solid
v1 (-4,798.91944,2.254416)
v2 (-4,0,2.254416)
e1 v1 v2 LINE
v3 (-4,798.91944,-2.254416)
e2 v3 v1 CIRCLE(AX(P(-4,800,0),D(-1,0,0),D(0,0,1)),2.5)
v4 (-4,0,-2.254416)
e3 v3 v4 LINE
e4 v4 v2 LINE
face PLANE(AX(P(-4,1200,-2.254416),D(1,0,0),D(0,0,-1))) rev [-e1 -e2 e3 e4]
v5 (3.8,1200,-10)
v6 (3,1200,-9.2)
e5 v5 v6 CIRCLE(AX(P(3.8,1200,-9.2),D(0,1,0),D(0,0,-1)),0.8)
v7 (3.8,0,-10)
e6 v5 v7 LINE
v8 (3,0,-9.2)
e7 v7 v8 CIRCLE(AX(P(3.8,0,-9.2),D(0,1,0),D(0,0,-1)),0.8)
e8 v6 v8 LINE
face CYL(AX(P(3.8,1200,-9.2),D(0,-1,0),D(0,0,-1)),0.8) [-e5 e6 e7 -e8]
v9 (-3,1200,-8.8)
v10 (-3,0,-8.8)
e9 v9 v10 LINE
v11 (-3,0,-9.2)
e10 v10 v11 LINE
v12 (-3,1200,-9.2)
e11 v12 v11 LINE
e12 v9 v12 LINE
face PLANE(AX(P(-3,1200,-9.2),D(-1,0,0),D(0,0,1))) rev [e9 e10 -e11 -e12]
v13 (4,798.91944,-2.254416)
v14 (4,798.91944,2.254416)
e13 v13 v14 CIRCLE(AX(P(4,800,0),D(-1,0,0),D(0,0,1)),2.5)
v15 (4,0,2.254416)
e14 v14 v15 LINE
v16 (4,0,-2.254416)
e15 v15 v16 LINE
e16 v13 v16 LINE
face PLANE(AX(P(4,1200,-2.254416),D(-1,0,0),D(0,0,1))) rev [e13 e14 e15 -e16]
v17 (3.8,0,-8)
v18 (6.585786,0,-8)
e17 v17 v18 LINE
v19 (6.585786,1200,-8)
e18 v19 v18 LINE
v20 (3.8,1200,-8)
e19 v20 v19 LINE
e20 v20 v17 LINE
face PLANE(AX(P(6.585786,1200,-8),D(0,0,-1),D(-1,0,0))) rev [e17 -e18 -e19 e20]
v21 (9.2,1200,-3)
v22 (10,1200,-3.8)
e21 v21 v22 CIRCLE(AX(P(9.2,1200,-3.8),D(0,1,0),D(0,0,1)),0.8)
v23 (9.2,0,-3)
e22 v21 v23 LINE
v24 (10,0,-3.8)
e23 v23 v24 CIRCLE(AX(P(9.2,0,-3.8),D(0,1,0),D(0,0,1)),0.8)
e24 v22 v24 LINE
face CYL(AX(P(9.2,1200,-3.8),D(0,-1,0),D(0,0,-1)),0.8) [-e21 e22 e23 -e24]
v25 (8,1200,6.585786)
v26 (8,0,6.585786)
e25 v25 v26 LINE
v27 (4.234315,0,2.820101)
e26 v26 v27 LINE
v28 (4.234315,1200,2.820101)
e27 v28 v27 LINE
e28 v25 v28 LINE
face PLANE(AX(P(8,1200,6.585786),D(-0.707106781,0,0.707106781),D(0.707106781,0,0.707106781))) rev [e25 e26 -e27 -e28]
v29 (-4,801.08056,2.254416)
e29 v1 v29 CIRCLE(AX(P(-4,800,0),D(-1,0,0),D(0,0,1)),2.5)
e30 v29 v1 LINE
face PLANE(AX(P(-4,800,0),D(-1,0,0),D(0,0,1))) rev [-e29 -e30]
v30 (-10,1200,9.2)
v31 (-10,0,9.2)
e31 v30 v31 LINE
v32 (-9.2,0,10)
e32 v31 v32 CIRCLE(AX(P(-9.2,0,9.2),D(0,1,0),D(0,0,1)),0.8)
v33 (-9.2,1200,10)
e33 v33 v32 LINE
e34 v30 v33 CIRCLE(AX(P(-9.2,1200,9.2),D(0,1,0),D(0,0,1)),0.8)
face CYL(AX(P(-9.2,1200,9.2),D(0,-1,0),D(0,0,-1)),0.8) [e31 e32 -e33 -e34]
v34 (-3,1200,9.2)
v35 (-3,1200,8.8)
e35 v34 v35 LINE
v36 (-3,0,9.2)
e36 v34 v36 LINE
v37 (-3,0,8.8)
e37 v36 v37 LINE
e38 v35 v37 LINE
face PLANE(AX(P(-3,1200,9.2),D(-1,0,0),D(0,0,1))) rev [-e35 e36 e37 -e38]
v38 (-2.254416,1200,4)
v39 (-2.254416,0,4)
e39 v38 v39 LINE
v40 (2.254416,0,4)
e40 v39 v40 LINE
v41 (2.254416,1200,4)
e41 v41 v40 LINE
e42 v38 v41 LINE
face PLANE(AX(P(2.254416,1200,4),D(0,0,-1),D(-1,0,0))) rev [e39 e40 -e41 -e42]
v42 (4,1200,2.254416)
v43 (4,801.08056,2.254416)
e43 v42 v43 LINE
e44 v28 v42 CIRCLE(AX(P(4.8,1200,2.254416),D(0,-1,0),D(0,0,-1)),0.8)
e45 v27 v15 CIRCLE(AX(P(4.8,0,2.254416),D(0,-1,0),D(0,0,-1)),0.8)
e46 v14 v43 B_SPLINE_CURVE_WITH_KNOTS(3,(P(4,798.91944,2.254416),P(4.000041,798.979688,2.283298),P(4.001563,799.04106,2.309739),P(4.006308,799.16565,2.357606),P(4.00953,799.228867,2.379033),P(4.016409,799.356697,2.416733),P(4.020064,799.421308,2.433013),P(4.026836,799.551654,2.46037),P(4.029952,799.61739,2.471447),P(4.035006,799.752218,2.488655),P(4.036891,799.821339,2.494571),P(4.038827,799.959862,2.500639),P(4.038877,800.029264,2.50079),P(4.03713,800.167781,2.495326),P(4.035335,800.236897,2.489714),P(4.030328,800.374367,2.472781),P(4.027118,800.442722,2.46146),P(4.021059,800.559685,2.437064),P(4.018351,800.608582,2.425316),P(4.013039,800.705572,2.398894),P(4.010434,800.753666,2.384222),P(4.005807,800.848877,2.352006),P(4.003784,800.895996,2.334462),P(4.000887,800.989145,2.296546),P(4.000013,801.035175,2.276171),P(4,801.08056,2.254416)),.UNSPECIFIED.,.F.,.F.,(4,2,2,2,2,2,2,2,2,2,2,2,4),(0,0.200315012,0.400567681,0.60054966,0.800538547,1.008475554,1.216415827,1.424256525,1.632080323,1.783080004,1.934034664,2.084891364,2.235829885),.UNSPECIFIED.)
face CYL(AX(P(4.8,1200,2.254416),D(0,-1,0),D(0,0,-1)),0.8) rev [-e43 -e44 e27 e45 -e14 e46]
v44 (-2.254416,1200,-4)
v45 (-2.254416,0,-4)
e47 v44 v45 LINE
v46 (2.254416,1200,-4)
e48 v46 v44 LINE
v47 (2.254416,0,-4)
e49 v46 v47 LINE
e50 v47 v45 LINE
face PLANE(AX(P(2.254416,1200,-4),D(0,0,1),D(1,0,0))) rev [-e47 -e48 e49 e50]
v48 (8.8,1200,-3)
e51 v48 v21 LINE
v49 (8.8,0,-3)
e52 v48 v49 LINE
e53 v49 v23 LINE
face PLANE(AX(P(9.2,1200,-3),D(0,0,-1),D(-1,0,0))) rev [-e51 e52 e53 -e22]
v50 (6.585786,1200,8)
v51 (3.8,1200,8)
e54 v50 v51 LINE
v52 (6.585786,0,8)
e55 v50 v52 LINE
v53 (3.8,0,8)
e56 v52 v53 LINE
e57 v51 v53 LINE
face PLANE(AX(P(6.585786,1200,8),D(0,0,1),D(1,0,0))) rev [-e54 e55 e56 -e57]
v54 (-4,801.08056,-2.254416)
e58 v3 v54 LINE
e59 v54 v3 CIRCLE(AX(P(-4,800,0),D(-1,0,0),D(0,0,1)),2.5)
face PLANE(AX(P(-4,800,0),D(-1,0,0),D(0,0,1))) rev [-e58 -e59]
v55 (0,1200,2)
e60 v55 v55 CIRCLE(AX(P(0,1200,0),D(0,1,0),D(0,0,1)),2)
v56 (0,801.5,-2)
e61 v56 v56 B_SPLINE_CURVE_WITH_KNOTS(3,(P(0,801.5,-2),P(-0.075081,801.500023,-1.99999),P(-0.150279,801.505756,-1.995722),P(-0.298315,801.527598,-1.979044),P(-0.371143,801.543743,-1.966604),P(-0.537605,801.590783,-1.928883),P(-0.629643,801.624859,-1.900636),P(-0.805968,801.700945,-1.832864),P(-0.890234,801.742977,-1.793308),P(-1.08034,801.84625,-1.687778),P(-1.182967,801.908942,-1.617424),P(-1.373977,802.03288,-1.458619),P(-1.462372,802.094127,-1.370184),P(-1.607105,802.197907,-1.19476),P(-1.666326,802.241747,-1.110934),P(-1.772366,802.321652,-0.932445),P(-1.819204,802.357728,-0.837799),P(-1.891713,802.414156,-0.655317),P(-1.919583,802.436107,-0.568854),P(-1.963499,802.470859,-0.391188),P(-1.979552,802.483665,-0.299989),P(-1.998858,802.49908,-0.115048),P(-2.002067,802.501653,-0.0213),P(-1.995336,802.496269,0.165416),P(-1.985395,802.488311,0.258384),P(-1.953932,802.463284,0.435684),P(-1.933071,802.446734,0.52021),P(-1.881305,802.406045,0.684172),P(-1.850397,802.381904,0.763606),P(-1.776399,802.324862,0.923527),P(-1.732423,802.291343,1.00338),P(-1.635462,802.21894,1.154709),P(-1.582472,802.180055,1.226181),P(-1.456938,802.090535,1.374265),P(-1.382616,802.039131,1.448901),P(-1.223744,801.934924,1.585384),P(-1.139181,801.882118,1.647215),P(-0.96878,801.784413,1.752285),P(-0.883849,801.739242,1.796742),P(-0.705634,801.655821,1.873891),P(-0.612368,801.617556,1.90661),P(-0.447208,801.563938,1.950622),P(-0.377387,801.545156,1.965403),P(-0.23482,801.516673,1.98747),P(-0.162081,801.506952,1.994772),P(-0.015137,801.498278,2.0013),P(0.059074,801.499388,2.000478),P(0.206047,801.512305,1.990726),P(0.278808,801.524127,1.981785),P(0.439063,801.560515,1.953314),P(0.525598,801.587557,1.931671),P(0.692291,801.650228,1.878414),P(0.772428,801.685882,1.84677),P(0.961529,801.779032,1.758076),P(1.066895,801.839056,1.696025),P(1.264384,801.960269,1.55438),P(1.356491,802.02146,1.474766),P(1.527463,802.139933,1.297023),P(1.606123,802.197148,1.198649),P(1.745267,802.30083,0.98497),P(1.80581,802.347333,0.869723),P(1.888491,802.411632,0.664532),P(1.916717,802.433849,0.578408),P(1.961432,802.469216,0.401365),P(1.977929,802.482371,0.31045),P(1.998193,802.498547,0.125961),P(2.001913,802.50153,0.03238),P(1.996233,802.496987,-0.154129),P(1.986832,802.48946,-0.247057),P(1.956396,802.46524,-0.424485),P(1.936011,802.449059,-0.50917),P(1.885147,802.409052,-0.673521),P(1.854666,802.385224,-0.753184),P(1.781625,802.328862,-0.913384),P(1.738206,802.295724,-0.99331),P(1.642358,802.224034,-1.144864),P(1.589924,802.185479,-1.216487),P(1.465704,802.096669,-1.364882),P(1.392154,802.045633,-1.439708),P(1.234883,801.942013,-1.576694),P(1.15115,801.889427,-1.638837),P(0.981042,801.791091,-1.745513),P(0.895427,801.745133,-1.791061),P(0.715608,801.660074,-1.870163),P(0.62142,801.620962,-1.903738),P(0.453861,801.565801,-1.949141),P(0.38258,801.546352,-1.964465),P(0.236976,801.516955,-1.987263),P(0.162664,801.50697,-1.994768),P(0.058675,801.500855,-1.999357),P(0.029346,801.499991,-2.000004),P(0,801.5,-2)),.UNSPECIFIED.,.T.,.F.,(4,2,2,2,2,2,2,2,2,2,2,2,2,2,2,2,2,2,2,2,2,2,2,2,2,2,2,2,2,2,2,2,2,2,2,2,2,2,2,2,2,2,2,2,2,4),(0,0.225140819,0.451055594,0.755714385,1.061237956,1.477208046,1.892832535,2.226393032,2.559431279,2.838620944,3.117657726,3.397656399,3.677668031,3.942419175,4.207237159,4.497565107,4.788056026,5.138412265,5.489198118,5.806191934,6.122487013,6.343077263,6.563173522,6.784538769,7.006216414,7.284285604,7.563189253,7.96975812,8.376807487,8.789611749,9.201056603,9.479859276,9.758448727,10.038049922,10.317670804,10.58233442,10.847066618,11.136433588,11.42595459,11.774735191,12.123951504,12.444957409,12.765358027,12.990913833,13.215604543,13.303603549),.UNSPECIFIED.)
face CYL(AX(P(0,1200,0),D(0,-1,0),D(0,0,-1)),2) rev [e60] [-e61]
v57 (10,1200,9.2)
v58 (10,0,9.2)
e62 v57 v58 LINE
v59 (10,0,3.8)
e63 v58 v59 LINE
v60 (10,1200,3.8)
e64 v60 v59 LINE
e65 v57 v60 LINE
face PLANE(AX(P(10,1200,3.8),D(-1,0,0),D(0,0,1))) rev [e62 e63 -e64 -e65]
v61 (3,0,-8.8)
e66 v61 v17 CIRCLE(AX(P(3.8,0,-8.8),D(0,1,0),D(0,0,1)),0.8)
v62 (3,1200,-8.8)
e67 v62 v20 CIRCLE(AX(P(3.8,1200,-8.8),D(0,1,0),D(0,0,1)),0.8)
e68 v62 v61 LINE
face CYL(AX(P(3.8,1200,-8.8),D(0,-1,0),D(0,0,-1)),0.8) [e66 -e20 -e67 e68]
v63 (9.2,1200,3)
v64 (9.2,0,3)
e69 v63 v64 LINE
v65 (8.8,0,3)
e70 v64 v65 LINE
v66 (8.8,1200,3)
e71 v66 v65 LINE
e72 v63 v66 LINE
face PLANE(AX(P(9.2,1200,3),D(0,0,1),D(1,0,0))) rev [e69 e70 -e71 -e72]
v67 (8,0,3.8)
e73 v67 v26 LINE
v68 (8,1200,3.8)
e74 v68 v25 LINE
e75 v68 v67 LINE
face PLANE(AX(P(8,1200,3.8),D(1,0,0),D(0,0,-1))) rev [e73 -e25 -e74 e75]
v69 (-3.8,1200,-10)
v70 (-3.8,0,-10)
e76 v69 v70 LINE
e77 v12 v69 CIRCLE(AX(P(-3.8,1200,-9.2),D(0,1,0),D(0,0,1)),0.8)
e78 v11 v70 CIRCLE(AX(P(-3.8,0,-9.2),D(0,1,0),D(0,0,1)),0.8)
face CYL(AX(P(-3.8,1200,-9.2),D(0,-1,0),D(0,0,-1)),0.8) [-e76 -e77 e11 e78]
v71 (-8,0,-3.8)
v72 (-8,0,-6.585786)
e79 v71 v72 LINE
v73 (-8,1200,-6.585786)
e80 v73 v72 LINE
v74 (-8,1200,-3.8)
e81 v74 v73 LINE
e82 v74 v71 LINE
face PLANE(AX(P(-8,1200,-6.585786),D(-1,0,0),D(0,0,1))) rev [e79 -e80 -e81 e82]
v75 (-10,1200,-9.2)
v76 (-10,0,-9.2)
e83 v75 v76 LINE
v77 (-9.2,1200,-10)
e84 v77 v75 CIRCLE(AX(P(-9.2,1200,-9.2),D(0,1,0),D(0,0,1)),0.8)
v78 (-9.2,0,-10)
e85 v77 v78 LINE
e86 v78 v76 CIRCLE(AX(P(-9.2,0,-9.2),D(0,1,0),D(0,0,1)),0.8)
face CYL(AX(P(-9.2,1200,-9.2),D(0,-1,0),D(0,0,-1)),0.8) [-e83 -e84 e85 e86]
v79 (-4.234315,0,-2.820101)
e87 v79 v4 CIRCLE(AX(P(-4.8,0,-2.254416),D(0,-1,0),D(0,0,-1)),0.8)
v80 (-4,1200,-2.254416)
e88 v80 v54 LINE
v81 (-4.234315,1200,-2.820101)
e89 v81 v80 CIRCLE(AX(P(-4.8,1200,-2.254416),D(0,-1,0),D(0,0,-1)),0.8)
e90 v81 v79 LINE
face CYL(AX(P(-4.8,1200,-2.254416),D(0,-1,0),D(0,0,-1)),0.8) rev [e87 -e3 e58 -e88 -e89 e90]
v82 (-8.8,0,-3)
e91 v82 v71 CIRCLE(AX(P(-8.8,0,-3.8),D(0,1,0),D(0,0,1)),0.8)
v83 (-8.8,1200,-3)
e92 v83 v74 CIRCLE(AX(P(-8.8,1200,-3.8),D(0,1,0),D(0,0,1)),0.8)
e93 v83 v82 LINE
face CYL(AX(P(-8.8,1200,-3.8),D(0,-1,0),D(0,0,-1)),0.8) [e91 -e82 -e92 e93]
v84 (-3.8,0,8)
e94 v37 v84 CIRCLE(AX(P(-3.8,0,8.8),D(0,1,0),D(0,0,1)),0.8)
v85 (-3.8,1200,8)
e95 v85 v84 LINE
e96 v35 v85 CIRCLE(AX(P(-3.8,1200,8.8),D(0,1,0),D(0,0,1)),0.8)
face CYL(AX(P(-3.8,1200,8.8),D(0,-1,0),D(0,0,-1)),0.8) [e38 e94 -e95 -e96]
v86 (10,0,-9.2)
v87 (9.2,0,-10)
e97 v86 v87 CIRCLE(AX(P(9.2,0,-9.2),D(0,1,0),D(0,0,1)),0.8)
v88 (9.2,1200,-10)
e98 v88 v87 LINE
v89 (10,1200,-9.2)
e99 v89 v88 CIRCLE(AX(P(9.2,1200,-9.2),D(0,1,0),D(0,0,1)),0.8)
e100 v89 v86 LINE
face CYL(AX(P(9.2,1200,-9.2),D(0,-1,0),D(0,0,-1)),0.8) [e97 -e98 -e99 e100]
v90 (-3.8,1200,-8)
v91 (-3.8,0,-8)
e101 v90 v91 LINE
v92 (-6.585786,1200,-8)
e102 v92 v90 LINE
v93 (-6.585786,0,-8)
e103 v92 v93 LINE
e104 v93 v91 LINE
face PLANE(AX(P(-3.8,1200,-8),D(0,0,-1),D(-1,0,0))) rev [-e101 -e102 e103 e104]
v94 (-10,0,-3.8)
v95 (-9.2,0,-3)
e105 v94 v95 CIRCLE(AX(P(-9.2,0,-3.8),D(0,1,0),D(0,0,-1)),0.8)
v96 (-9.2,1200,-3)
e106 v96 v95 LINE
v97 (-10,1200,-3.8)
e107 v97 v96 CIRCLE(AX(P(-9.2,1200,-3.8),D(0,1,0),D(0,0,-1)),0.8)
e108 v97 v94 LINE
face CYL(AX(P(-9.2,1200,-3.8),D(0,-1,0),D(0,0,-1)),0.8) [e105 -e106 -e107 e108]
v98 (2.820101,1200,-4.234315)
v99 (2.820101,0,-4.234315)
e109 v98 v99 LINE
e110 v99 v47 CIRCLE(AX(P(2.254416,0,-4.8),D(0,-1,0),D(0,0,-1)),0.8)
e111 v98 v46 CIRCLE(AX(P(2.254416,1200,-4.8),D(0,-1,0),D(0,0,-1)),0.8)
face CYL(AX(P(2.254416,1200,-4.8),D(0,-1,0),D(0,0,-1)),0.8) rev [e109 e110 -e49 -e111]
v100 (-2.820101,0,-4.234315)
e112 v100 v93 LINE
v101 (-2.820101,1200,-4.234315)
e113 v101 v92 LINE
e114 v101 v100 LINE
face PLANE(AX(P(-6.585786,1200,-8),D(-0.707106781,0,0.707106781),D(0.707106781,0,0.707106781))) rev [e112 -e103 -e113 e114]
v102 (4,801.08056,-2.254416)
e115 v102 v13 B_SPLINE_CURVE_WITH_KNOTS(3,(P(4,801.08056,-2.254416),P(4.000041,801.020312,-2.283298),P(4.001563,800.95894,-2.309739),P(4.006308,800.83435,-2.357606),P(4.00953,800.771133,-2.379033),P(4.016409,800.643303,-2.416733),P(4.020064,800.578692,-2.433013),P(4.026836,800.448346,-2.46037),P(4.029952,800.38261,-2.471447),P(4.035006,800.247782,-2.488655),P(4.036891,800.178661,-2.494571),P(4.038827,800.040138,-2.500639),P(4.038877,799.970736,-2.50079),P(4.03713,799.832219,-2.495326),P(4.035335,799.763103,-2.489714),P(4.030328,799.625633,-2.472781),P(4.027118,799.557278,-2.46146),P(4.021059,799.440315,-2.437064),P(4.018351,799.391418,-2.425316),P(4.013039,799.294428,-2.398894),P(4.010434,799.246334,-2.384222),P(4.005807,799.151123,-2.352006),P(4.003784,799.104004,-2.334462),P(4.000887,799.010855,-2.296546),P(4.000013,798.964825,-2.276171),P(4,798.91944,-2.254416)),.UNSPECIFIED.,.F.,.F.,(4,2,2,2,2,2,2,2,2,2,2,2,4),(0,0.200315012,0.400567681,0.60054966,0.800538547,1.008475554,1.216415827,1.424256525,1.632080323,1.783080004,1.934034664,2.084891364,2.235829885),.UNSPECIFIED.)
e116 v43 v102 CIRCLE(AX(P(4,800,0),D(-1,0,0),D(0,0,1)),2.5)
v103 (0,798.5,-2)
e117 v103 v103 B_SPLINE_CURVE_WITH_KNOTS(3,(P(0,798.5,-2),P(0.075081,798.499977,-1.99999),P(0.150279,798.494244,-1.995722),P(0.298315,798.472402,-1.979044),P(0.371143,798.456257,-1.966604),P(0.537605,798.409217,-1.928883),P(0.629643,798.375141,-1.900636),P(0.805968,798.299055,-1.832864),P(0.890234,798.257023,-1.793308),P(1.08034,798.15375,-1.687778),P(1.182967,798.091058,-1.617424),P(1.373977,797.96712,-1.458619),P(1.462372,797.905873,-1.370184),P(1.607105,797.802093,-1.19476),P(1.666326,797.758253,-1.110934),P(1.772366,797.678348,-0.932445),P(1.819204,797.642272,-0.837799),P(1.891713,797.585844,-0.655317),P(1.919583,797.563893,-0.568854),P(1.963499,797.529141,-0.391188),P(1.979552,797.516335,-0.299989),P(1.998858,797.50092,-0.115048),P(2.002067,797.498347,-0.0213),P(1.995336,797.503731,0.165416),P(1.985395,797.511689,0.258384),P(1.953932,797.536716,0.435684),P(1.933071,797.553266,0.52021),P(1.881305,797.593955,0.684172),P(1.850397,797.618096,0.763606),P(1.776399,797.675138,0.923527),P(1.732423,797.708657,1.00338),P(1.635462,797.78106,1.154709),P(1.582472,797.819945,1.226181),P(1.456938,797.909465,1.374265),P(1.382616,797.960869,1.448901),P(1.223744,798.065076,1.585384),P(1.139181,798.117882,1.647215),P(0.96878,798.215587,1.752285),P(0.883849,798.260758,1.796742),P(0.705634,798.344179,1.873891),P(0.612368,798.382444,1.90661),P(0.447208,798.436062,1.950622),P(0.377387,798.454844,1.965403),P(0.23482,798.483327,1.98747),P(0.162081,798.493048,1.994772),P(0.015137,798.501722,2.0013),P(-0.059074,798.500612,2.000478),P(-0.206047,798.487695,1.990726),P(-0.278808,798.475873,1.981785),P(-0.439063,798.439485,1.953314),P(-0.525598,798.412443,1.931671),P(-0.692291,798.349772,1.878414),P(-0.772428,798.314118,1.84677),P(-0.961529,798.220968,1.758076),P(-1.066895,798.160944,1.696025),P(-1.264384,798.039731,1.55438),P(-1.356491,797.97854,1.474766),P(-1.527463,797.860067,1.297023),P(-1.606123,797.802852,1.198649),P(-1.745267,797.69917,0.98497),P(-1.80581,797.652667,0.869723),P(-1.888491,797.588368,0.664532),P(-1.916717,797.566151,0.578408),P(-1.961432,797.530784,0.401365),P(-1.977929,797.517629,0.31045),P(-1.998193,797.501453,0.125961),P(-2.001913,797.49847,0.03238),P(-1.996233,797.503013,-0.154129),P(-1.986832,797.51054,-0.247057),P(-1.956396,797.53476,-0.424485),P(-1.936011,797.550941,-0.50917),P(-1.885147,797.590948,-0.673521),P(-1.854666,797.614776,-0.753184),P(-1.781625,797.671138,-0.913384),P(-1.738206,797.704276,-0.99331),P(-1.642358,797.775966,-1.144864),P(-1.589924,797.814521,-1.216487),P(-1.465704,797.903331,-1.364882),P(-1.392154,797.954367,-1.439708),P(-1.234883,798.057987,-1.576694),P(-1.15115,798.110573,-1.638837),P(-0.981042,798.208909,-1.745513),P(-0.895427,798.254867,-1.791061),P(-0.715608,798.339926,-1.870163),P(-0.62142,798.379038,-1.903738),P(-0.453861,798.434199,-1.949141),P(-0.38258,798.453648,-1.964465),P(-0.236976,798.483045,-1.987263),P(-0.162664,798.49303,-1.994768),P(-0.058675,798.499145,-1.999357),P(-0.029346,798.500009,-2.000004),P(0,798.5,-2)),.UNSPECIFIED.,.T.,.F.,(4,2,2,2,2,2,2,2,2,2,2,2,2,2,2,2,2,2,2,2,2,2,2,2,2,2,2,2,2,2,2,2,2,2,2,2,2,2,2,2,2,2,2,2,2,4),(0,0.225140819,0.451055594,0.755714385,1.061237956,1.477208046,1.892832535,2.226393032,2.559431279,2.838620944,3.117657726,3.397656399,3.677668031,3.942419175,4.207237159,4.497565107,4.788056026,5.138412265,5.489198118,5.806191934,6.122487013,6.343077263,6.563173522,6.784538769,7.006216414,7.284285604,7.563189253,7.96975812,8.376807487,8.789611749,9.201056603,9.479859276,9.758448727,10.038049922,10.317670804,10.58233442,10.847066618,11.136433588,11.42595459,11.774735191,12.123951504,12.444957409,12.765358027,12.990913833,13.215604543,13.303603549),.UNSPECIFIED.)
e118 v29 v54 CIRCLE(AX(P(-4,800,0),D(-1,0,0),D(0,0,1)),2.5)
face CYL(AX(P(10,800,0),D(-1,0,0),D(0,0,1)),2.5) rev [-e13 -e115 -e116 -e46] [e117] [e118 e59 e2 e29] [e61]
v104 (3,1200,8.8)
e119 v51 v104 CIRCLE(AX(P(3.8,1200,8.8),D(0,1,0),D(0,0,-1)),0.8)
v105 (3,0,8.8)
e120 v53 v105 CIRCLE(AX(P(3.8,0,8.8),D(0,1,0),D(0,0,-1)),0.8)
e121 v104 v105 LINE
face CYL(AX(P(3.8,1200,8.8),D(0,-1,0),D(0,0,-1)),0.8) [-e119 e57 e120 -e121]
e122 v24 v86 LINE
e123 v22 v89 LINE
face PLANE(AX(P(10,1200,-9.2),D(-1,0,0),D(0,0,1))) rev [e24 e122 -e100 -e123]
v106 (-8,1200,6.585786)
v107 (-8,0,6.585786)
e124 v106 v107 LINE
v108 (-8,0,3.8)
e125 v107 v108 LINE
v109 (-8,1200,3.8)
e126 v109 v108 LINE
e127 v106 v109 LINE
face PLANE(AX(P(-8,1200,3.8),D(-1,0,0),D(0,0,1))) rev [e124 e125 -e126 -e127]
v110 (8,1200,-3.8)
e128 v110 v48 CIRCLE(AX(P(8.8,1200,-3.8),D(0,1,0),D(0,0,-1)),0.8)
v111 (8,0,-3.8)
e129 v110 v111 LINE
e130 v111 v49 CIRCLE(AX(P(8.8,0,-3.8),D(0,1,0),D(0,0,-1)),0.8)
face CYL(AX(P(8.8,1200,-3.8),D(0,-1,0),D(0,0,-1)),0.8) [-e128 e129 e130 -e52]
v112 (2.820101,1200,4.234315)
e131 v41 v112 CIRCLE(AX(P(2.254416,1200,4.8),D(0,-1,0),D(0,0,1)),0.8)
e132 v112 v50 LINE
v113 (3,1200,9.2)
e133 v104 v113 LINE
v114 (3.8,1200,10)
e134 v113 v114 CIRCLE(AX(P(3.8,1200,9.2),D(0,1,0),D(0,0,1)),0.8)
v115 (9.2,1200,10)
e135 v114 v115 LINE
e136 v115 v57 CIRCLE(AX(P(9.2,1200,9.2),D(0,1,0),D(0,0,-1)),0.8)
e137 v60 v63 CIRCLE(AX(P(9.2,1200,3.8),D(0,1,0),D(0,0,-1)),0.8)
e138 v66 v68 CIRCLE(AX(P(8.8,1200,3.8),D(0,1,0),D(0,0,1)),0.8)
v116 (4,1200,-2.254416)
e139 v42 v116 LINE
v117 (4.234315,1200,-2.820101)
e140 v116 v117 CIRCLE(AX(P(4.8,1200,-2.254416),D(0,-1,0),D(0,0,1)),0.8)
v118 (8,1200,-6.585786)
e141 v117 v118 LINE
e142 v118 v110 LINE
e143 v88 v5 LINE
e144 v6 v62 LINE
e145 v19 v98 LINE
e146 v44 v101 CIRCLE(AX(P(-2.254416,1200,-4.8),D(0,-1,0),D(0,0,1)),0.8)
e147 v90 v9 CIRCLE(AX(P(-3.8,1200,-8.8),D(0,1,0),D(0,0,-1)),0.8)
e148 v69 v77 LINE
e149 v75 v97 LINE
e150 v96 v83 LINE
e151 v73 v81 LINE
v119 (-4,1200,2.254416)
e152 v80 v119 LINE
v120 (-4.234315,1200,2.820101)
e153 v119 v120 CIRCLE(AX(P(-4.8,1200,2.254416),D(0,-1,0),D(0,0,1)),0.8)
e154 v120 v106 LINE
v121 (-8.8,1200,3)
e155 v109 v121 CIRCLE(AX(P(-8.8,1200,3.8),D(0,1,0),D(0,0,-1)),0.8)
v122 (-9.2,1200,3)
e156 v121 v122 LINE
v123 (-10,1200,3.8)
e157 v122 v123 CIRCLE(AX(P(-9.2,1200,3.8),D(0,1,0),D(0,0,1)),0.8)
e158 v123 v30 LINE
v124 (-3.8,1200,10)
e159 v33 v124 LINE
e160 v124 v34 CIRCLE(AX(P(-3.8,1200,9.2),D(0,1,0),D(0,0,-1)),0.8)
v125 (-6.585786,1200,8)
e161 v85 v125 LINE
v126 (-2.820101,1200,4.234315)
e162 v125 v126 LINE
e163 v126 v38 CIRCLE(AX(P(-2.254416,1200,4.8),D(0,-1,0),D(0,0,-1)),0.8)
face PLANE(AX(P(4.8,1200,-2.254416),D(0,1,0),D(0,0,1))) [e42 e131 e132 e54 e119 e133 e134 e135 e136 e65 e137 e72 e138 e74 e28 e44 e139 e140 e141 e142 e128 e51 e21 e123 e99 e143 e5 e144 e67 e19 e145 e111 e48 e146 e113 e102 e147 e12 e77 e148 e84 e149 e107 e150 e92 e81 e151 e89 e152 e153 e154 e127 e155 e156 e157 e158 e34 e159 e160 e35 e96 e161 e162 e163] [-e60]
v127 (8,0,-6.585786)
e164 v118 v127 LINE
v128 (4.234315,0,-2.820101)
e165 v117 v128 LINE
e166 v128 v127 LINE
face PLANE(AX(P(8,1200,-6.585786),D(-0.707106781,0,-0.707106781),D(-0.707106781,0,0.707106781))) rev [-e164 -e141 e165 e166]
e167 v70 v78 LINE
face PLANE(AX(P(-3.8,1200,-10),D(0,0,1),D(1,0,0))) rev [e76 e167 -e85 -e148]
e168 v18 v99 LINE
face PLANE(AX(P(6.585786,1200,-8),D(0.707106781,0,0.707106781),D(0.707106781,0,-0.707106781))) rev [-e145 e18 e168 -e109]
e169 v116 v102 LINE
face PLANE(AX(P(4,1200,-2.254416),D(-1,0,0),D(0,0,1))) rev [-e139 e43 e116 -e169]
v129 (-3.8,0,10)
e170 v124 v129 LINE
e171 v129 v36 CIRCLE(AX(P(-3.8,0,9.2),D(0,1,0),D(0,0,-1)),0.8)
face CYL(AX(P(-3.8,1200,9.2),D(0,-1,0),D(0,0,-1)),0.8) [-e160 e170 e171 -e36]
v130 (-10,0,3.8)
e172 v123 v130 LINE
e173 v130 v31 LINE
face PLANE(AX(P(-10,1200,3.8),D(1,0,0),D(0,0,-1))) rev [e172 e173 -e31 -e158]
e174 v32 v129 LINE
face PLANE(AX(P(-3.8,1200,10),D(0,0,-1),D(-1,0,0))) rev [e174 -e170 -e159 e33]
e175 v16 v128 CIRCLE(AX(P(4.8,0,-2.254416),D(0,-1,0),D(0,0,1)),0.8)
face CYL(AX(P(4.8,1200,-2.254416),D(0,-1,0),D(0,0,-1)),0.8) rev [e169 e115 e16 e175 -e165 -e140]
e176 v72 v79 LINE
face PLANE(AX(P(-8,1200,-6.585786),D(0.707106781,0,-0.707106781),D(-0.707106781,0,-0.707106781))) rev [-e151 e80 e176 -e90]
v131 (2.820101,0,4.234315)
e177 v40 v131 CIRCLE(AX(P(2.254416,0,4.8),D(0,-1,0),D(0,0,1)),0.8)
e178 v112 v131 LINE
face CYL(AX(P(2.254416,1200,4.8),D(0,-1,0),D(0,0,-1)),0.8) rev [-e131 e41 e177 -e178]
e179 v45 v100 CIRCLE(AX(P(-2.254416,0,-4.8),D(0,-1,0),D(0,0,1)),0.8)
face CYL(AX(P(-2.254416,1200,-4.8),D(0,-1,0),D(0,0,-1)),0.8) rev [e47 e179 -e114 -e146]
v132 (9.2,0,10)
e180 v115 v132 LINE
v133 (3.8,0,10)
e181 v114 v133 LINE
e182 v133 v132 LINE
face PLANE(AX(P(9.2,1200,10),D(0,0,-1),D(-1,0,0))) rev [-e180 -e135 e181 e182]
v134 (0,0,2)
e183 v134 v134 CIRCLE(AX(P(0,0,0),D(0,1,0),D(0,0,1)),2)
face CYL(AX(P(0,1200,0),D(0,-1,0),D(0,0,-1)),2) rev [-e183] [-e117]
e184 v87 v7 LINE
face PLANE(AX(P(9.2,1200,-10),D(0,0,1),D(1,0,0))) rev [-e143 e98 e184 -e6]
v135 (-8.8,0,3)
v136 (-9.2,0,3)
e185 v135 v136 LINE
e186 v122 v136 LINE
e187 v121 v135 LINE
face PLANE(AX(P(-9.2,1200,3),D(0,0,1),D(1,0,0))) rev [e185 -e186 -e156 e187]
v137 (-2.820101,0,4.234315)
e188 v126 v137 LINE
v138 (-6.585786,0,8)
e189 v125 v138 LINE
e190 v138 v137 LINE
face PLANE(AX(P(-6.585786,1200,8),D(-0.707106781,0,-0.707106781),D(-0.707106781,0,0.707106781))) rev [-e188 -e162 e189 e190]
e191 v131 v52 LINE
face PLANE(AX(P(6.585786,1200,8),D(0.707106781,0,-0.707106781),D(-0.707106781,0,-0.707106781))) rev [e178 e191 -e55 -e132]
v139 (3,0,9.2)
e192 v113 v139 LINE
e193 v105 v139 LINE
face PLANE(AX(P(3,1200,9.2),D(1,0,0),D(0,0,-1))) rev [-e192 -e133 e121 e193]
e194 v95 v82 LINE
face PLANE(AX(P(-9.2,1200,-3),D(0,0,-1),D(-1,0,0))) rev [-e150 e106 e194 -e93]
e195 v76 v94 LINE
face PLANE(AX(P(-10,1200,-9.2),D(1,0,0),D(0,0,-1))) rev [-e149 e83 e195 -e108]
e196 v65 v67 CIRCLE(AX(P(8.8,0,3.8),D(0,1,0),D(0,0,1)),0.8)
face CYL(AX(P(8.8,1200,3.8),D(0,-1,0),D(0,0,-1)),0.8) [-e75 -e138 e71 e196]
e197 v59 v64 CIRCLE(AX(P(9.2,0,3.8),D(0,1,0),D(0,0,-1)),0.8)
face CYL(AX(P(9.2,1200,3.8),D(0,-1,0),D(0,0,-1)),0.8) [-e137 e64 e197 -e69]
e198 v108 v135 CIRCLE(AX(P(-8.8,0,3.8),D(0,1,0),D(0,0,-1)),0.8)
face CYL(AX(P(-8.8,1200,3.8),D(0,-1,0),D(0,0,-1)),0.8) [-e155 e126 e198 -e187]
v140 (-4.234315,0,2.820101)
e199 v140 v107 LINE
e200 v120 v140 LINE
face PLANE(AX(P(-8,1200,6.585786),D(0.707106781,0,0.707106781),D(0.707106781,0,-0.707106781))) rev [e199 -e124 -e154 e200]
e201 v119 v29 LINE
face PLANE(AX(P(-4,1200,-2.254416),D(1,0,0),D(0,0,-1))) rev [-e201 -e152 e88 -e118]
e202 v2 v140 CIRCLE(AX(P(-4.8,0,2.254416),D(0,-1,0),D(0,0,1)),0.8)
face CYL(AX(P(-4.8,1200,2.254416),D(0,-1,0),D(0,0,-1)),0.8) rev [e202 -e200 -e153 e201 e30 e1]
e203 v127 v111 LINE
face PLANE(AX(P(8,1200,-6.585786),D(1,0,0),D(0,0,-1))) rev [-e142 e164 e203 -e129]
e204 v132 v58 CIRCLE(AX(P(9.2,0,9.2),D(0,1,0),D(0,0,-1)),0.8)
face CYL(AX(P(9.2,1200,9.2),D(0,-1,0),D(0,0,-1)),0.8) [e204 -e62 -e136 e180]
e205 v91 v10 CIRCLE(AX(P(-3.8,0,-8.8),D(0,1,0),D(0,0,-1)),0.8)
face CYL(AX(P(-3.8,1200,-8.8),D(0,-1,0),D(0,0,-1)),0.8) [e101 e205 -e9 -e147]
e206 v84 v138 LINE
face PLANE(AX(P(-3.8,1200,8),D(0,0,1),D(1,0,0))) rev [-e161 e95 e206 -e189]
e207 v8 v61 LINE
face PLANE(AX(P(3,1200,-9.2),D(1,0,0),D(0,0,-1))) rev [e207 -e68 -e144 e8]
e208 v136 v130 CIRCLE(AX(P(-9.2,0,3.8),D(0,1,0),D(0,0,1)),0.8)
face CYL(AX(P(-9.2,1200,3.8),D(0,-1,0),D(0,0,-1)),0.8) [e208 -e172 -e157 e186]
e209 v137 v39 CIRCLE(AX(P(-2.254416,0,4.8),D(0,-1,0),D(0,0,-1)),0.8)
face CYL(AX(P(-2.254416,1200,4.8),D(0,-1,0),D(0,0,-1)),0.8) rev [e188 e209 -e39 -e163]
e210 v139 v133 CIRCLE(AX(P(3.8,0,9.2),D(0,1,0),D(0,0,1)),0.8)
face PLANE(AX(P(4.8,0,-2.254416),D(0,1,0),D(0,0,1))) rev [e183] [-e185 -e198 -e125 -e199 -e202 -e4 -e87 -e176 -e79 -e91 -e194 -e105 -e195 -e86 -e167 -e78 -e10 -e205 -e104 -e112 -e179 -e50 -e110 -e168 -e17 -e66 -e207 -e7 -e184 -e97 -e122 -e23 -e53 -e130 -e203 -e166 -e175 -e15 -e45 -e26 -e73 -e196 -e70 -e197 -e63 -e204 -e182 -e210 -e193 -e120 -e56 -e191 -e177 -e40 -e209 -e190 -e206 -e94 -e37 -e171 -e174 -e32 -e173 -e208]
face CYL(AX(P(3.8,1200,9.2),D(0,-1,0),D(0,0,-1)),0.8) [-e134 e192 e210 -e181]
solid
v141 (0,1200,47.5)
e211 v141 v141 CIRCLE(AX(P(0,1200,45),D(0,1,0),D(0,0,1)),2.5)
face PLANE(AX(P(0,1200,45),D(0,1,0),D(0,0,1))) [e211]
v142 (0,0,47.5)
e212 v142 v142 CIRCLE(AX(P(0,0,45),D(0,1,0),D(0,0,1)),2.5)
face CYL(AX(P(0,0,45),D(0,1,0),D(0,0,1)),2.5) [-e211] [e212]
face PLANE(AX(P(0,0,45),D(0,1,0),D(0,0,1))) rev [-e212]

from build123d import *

# Parameters (mm, degrees)
ALUMINIUM_PROFILE_SIZES_4X4_1_OUTLINE_R = 2
ALUMINIUM_PROFILE_SIZES_4X4_1_DEPTH     = 1200
SKETCH12_R                              = 2.5
BOSS_EXTRUDE1_DEPTH                     = 1200
SKETCH13_R                              = 2.5
CUT_EXTRUDE1_DEPTH                      = 1202.021336197


# Read off the part's stored shape, not the designer's step: Aluminium profile sizes 4X4(1)
with BuildPart() as part:
    # Aluminium profile sizes 4X4(1) outline → Aluminium profile sizes 4X4(1) (new body)
    with BuildSketch(Plane(origin=(0, 0, 0), x_dir=(1, 0, 0), z_dir=(0, 1, 0))):
        with BuildLine():
            Line((4, -2.254415588), (4, 2.254415588))
            ThreePointArc((4, 2.254415588), (4.060896374, 2.560562334), (4.234314575, 2.820101013))
            Line((4.234314575, 2.820101013), (8, 6.585786438))
            Line((8, 6.585786438), (8, 3.8))
            ThreePointArc((8, 3.8), (8.234314575, 3.234314575), (8.8, 3))
            Line((8.8, 3), (9.2, 3))
            ThreePointArc((9.2, 3), (9.765685425, 3.234314575), (10, 3.8))
            Line((10, 3.8), (10, 9.2))
            ThreePointArc((10, 9.2), (9.765685425, 9.765685425), (9.2, 10))
            Line((9.2, 10), (3.8, 10))
            ThreePointArc((3.8, 10), (3.234314575, 9.765685425), (3, 9.2))
            Line((3, 9.2), (3, 8.8))
            ThreePointArc((3, 8.8), (3.234314575, 8.234314575), (3.8, 8))
            Line((3.8, 8), (6.585786438, 8))
            Line((6.585786438, 8), (2.820101013, 4.234314575))
            ThreePointArc((2.820101013, 4.234314575), (2.560562334, 4.060896374), (2.254415588, 4))
            Line((2.254415588, 4), (-2.254415588, 4))
            ThreePointArc((-2.254415588, 4), (-2.560562334, 4.060896374), (-2.820101013, 4.234314575))
            Line((-2.820101013, 4.234314575), (-6.585786438, 8))
            Line((-6.585786438, 8), (-3.8, 8))
            ThreePointArc((-3.8, 8), (-3.234314575, 8.234314575), (-3, 8.8))
            Line((-3, 8.8), (-3, 9.2))
            ThreePointArc((-3, 9.2), (-3.234314575, 9.765685425), (-3.8, 10))
            Line((-3.8, 10), (-9.2, 10))
            ThreePointArc((-9.2, 10), (-9.765685425, 9.765685425), (-10, 9.2))
            Line((-10, 9.2), (-10, 3.8))
            ThreePointArc((-10, 3.8), (-9.765685425, 3.234314575), (-9.2, 3))
            Line((-9.2, 3), (-8.8, 3))
            ThreePointArc((-8.8, 3), (-8.234314575, 3.234314575), (-8, 3.8))
            Line((-8, 3.8), (-8, 6.585786438))
            Line((-8, 6.585786438), (-4.234314575, 2.820101013))
            ThreePointArc((-4.234314575, 2.820101013), (-4.060896374, 2.560562334), (-4, 2.254415588))
            Line((-4, 2.254415588), (-4, -2.254415588))
            ThreePointArc((-4, -2.254415588), (-4.060896374, -2.560562334), (-4.234314575, -2.820101013))
            Line((-4.234314575, -2.820101013), (-8, -6.585786438))
            Line((-8, -6.585786438), (-8, -3.8))
            ThreePointArc((-8, -3.8), (-8.234314575, -3.234314575), (-8.8, -3))
            Line((-8.8, -3), (-9.2, -3))
            ThreePointArc((-9.2, -3), (-9.765685425, -3.234314575), (-10, -3.8))
            Line((-10, -3.8), (-10, -9.2))
            ThreePointArc((-10, -9.2), (-9.765685425, -9.765685425), (-9.2, -10))
            Line((-9.2, -10), (-3.8, -10))
            ThreePointArc((-3.8, -10), (-3.234314575, -9.765685425), (-3, -9.2))
            Line((-3, -9.2), (-3, -8.8))
            ThreePointArc((-3, -8.8), (-3.234314575, -8.234314575), (-3.8, -8))
            Line((-3.8, -8), (-6.585786438, -8))
            Line((-6.585786438, -8), (-2.820101013, -4.234314575))
            ThreePointArc((-2.820101013, -4.234314575), (-2.560562334, -4.060896374), (-2.254415588, -4))
            Line((-2.254415588, -4), (2.254415588, -4))
            ThreePointArc((2.254415588, -4), (2.560562334, -4.060896374), (2.820101013, -4.234314575))
            Line((2.820101013, -4.234314575), (6.585786438, -8))
            Line((6.585786438, -8), (3.8, -8))
            ThreePointArc((3.8, -8), (3.234314575, -8.234314575), (3, -8.8))
            Line((3, -8.8), (3, -9.2))
            ThreePointArc((3, -9.2), (3.234314575, -9.765685425), (3.8, -10))
            Line((3.8, -10), (9.2, -10))
            ThreePointArc((9.2, -10), (9.765685425, -9.765685425), (10, -9.2))
            Line((10, -9.2), (10, -3.8))
            ThreePointArc((10, -3.8), (9.765685425, -3.234314575), (9.2, -3))
            Line((9.2, -3), (8.8, -3))
            ThreePointArc((8.8, -3), (8.234314575, -3.234314575), (8, -3.8))
            Line((8, -3.8), (8, -6.585786438))
            Line((8, -6.585786438), (4.234314575, -2.820101013))
            ThreePointArc((4.234314575, -2.820101013), (4.060896374, -2.560562334), (4, -2.254415588))
        make_face()
        Circle(ALUMINIUM_PROFILE_SIZES_4X4_1_OUTLINE_R, mode=Mode.SUBTRACT)
    extrude(amount=ALUMINIUM_PROFILE_SIZES_4X4_1_DEPTH)

    # Sketch13 → Cut-Extrude1 (cut, through all)
    with BuildSketch(Plane.ZY.offset(4)):
        with Locations(Location((0, 800, 0), (0, 0, 25.608789007))):
            Circle(SKETCH13_R)
    extrude(amount=-CUT_EXTRUDE1_DEPTH, mode=Mode.SUBTRACT)


with BuildPart() as body_2:
    # Sketch12 → Boss-Extrude1 (new body)
    with BuildSketch(Plane(origin=(0, 1200, 0), x_dir=(1, 0, 0), z_dir=(0, 1, 0))):
        with Locations(Location((0, -45, 0), (0, 0, 270))):
            Circle(SKETCH12_R)
    extrude(amount=-BOSS_EXTRUDE1_DEPTH)


solid = Compound([part.part, body_2.part])
